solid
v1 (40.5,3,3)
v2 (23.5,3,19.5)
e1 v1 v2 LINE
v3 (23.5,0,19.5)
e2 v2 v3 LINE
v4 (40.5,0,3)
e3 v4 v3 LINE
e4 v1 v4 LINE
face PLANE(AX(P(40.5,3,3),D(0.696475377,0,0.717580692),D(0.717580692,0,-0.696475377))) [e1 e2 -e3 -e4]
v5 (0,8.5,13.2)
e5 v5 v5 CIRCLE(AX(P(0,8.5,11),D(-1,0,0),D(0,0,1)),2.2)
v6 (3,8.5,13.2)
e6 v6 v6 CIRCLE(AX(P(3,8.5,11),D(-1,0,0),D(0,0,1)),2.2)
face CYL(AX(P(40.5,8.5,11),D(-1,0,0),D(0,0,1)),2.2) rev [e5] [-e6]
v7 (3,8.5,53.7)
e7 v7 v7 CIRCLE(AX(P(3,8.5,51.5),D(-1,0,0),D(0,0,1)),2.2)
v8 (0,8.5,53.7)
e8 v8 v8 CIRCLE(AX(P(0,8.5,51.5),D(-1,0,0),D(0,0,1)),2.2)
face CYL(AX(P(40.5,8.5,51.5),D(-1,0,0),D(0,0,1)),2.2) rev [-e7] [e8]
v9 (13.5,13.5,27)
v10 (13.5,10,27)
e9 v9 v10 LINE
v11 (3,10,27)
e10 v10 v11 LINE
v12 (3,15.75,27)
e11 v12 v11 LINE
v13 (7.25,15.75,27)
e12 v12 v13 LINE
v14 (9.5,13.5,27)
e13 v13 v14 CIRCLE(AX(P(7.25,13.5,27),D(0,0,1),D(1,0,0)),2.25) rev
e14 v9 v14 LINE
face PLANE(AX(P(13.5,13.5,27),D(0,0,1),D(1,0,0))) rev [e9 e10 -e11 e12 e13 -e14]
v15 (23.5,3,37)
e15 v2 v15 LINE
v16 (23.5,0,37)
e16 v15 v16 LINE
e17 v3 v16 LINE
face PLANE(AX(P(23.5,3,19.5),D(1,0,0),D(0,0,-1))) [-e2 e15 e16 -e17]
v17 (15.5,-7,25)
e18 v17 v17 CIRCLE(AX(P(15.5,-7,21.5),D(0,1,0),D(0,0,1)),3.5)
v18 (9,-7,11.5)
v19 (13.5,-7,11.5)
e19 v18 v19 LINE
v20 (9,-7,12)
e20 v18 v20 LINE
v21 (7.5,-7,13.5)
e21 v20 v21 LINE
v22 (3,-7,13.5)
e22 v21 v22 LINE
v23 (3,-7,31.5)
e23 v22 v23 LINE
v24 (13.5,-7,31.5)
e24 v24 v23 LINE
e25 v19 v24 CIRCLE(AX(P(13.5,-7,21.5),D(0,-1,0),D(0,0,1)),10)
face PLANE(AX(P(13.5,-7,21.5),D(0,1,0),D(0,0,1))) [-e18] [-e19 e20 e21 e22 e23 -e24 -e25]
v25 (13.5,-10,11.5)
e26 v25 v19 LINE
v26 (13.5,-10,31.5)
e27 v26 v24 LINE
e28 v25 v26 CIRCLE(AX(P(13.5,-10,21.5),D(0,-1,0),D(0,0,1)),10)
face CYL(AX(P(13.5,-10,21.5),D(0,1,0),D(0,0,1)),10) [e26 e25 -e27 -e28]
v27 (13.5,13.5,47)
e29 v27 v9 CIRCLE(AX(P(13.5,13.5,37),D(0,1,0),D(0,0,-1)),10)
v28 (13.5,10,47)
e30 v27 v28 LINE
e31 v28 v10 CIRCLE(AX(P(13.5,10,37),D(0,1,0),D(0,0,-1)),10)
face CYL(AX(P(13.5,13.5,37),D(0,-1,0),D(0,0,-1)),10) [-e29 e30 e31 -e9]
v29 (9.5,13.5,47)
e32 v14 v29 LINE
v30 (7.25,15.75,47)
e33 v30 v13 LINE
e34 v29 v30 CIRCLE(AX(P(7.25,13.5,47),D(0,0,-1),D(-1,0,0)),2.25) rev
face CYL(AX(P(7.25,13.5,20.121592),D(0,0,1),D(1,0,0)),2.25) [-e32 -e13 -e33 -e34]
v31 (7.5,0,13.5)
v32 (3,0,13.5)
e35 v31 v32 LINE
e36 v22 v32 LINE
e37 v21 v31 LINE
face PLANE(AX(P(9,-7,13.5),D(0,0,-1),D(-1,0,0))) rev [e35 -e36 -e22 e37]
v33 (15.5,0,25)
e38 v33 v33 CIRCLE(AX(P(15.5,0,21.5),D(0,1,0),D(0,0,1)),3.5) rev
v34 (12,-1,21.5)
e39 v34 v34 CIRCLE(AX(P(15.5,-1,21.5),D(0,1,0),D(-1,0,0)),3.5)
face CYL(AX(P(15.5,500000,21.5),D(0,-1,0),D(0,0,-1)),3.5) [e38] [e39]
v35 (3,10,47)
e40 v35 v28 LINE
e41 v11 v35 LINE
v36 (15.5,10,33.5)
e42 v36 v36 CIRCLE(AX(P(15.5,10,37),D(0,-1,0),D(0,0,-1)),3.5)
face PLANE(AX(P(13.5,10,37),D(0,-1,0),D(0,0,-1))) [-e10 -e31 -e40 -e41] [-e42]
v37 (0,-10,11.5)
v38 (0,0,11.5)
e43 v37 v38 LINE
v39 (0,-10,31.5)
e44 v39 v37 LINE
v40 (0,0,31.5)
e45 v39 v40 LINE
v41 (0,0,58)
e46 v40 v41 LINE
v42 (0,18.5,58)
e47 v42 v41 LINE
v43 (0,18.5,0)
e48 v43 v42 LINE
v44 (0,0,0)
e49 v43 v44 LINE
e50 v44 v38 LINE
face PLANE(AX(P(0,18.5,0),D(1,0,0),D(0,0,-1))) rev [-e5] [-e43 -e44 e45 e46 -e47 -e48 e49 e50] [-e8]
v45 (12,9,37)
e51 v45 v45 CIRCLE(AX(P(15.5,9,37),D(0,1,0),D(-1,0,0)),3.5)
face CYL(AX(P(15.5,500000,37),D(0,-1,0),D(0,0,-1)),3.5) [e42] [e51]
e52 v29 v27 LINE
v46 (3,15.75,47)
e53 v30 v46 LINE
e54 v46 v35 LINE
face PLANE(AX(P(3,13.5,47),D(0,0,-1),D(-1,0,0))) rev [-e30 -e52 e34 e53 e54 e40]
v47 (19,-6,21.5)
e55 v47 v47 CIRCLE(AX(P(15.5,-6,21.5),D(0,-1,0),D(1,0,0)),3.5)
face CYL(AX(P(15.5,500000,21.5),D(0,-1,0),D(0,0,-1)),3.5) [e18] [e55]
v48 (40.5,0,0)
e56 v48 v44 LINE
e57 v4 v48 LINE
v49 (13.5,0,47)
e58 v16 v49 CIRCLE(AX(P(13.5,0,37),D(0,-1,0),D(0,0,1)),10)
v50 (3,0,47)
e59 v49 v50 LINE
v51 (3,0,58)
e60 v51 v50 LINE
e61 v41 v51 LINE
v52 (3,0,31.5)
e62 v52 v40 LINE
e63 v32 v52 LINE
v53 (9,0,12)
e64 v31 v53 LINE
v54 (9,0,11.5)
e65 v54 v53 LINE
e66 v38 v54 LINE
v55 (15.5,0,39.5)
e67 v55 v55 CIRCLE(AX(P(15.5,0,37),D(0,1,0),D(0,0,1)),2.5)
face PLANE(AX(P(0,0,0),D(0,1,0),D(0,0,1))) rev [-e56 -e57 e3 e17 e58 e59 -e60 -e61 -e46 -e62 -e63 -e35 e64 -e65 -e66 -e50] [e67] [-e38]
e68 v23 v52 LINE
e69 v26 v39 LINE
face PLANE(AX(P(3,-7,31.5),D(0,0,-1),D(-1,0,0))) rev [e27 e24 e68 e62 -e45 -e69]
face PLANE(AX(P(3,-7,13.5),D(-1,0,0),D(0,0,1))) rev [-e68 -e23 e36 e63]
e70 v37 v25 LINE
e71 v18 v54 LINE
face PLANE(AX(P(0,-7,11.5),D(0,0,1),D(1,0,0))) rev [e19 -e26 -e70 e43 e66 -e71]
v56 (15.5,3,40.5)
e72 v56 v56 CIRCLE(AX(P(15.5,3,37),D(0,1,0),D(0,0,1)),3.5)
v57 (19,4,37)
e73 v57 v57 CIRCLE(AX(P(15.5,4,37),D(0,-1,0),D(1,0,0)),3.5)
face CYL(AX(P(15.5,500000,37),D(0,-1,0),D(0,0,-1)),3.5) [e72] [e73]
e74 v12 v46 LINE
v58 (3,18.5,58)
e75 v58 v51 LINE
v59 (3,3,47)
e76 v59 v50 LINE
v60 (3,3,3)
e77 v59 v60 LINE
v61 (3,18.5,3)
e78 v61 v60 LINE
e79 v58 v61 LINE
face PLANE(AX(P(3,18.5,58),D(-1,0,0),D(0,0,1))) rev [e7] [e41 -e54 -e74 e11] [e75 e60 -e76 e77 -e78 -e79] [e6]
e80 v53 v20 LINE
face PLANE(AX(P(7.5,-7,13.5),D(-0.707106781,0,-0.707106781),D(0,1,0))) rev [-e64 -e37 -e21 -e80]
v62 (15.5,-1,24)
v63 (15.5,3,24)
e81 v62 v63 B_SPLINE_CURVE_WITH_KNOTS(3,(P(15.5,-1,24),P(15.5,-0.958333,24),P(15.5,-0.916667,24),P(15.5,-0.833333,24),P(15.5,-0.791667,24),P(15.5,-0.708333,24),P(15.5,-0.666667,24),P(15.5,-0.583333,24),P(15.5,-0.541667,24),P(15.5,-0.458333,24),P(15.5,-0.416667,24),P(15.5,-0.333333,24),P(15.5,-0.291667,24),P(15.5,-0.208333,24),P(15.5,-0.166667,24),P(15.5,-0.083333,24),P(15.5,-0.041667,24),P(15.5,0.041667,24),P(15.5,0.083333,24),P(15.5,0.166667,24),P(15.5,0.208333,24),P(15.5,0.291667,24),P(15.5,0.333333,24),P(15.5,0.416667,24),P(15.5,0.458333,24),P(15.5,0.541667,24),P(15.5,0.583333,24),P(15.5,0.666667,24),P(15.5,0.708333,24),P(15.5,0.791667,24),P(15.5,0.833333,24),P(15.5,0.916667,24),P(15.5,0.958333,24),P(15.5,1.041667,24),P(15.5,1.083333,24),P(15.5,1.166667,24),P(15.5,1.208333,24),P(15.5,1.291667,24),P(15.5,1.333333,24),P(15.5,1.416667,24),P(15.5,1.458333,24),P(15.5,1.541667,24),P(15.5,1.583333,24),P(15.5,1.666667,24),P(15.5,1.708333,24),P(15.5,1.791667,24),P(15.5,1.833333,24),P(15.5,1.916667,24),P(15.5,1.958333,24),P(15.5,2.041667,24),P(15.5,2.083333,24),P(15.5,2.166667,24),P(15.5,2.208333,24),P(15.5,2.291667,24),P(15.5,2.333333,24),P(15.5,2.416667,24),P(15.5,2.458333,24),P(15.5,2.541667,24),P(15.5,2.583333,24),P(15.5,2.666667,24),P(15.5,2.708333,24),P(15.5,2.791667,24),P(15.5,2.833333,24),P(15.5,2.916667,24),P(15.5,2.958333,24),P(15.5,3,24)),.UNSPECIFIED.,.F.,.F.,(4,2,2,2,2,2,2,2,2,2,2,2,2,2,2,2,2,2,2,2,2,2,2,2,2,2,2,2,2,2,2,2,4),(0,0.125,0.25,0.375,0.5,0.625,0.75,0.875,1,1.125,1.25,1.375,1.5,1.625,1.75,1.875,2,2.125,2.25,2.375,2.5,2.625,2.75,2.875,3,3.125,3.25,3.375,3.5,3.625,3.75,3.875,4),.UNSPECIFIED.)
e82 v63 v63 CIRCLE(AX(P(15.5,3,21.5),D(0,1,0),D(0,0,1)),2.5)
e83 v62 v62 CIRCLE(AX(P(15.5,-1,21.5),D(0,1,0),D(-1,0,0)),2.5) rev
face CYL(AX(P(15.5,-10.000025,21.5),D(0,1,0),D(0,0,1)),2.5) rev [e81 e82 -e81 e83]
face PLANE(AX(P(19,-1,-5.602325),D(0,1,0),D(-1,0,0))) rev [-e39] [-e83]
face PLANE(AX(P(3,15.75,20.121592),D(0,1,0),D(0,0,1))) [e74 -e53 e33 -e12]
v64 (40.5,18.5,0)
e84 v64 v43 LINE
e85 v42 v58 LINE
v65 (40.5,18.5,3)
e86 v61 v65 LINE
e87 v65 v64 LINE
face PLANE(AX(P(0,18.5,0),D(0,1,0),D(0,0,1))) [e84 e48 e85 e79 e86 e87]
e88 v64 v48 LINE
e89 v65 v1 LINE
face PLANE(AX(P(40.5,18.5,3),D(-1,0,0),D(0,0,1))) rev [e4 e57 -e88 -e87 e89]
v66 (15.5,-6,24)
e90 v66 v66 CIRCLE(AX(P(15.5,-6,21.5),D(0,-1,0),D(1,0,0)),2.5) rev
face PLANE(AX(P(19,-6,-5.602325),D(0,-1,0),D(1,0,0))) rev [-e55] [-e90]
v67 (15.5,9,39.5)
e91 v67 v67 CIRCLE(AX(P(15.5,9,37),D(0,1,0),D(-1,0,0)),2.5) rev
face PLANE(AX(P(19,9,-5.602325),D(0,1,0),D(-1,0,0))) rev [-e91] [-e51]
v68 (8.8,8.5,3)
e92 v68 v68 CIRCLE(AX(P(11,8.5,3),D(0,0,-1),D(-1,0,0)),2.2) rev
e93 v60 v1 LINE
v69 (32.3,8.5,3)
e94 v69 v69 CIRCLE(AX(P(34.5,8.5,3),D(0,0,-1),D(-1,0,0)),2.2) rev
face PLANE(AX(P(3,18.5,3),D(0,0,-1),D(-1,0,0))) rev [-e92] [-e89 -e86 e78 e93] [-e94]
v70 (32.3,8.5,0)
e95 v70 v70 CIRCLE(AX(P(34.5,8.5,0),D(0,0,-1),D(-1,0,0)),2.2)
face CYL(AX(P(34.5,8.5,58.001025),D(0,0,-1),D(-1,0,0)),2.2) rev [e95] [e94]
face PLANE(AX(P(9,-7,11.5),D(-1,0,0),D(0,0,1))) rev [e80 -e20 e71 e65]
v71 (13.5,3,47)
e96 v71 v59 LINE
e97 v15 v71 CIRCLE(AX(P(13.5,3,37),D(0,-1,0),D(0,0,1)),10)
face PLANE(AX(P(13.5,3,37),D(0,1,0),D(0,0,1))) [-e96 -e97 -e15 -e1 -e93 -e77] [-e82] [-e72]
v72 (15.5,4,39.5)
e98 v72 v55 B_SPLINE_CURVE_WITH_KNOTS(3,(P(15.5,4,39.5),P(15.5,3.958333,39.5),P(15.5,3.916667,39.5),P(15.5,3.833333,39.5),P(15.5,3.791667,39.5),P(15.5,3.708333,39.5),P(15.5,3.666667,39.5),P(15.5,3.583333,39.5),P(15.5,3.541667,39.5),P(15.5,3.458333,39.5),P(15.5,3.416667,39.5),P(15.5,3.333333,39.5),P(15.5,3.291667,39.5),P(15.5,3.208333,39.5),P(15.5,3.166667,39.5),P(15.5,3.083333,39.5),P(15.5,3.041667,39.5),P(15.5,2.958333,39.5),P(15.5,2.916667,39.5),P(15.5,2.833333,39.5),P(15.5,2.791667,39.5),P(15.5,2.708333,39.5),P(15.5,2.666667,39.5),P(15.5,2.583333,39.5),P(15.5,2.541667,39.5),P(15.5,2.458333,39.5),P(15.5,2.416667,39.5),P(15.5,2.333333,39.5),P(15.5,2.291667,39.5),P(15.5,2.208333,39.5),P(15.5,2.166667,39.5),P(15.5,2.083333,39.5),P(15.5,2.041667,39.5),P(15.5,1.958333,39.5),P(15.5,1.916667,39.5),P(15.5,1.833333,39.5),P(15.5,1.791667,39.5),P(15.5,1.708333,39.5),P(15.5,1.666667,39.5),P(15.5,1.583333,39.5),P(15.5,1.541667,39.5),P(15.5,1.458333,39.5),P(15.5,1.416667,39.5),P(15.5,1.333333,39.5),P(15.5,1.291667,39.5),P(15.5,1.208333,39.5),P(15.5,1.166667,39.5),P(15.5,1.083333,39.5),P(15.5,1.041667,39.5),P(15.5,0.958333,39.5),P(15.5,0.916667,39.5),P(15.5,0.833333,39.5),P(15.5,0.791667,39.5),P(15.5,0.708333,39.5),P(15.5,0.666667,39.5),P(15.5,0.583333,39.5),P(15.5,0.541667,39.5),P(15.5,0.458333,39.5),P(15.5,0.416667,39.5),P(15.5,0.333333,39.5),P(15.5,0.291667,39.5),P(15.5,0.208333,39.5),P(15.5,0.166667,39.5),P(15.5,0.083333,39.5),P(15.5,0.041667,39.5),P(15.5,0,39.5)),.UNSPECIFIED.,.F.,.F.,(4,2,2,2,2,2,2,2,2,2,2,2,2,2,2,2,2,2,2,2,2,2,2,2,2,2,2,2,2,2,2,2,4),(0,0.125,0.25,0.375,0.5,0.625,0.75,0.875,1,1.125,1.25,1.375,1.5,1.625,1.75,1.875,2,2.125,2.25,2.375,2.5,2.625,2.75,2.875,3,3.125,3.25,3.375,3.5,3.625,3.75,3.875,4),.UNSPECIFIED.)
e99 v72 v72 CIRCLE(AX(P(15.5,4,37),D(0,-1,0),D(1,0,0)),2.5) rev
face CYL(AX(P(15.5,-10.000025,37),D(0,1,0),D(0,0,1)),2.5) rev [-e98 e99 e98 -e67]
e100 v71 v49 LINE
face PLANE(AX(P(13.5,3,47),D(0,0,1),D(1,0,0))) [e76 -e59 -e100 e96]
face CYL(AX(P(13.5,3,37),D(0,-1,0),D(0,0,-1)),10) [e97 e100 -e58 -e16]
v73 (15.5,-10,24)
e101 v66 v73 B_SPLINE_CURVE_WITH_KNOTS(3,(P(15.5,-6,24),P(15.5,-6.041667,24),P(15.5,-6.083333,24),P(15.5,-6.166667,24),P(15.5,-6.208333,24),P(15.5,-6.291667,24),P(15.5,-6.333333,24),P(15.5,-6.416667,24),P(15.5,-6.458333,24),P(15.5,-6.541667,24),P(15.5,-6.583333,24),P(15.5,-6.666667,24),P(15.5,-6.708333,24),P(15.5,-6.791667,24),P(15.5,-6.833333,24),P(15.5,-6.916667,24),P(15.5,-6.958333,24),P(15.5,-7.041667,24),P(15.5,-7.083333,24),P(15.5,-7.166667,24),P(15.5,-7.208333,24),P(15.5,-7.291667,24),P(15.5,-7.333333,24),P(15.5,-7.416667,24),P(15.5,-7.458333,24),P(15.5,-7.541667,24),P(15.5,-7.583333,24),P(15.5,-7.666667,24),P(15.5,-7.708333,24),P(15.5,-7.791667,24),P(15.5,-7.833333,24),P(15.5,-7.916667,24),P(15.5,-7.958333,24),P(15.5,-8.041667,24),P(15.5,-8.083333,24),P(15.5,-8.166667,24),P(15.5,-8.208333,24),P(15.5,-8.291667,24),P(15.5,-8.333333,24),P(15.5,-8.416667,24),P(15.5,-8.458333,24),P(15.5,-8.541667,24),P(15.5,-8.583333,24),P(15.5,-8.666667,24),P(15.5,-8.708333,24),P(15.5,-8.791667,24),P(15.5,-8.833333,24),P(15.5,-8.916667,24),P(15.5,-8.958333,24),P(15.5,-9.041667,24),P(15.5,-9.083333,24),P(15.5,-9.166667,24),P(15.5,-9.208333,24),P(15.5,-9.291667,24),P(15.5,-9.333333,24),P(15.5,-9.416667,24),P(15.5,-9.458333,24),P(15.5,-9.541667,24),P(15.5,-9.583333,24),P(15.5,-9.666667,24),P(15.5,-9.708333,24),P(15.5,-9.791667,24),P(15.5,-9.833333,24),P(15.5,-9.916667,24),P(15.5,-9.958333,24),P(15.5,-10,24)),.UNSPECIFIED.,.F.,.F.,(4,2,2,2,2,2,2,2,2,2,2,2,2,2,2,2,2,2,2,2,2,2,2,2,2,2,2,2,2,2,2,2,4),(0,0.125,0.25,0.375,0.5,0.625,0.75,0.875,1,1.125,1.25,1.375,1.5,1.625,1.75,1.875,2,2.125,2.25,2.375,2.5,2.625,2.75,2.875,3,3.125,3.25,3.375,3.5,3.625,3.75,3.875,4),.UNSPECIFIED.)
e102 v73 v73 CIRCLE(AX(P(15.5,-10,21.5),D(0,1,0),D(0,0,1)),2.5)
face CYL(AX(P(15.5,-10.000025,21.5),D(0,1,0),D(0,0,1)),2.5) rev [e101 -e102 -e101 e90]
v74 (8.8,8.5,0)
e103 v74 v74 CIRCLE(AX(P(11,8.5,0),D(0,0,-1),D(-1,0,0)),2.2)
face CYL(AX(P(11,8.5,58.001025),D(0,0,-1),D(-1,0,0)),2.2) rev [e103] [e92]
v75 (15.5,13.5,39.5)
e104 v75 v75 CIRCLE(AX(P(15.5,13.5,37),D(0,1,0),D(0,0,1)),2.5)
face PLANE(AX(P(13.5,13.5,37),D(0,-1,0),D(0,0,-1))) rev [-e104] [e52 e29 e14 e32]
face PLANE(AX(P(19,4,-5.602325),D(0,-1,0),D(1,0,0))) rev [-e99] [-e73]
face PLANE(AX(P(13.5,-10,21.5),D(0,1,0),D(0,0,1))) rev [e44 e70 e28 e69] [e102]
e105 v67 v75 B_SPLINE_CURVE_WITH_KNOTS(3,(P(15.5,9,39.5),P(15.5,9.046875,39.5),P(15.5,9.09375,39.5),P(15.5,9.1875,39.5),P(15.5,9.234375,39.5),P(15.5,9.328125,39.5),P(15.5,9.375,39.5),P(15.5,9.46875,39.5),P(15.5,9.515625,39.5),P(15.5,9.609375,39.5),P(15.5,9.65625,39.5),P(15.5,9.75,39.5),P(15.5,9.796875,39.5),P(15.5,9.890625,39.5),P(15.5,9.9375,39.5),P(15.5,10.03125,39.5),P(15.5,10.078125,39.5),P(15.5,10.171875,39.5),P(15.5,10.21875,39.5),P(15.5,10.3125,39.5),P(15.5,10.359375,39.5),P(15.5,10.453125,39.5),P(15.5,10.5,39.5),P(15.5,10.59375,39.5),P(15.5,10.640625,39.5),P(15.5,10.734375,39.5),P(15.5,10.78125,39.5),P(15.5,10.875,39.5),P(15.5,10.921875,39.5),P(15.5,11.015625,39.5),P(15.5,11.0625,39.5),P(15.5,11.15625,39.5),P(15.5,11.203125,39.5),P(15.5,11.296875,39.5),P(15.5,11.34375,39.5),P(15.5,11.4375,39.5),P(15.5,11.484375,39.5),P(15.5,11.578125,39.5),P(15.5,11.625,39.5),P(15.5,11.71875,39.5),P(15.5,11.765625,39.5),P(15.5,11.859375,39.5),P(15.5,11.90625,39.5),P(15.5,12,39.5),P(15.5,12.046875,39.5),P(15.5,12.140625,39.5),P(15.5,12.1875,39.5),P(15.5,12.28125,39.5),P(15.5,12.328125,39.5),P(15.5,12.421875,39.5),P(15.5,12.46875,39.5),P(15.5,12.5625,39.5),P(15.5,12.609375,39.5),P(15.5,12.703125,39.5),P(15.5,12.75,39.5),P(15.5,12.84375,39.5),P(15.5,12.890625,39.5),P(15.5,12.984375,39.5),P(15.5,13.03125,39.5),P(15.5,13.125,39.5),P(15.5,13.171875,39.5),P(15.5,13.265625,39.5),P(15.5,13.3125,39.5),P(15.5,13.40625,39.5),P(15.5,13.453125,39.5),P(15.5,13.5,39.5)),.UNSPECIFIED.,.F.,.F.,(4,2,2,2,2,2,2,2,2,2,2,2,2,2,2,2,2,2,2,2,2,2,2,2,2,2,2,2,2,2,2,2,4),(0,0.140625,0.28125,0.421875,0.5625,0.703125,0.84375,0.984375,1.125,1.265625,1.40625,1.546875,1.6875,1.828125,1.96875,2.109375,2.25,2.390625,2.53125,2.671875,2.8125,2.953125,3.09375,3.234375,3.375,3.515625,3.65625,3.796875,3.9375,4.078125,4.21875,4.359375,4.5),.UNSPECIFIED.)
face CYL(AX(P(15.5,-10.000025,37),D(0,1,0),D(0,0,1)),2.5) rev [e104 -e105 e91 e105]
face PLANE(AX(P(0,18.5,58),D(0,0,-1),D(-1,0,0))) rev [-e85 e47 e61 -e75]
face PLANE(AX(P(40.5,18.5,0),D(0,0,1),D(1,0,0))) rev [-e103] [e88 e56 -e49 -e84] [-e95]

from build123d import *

# Parameters (mm, degrees)
BOSS_EXTRUDE1_DEPTH = 18.5
BOSS_EXTRUDE2_DEPTH = 3
BOSS_EXTRUDE3_START = 7
BOSS_EXTRUDE3_DEPTH = 3.5
SKETCH4_W           = 6.5
SKETCH4_H           = 2.25
BOSS_EXTRUDE4_DEPTH = 20
FILLET1_R           = 2.25
BOSS_EXTRUDE5_DEPTH = 7
BOSS_EXTRUDE6_DEPTH = 3
SKETCH7_R           = 2.5
CUT_EXTRUDE1_DEPTH  = 75.541934507
SKETCH8_R           = 2.2
CUT_EXTRUDE2_DEPTH  = 74.11976477
CUT_EXTRUDE3_REACH  = 75.12
SKETCH9_R           = 2.2
BOSS_EXTRUDE7_REACH = 77.196
SKETCH10_R          = 3.5
SKETCH10_R_2        = 2.5
BOSS_EXTRUDE8_REACH = 74.419
SKETCH11_R          = 3.5
SKETCH11_R_2        = 2.5
CUT_EXTRUDE4_REACH  = 66.742
SKETCH12_W          = 7
SKETCH12_H          = 5
CHAMFER1_SIZE       = 1.5


with BuildPart() as part:
    # Sketch1 → Boss-Extrude1 (new body)
    with BuildSketch(Plane(origin=(0, 0, 0), x_dir=(1, 0, 0), z_dir=(0, 1, 0))):
        Polygon((40.5, 0), (0, 0), (0, -58), (3, -58), (3, -3), (40.5, -3), align=None)
    extrude(amount=BOSS_EXTRUDE1_DEPTH)

    # Sketch2 → Boss-Extrude2 (add)
    with BuildSketch(Plane.XZ):
        with BuildLine():
            Line((40.5, 3), (23.5, 19.5))
            Line((23.5, 19.5), (23.5, 37))
            ThreePointArc((23.5, 37), (20.571067812, 44.071067812), (13.5, 47))
            Line((13.5, 47), (3, 47))
            Line((3, 47), (3, 3))
            Line((3, 3), (40.5, 3))
        make_face()
    extrude(amount=-BOSS_EXTRUDE2_DEPTH)

    # Sketch3 → Boss-Extrude3 (add)
    with BuildSketch(Plane(origin=(0, 3, 0), x_dir=(1, 0, 0), z_dir=(0, 1, 0)).offset(BOSS_EXTRUDE3_START)):
        with BuildLine():
            Line((3, -47), (13.5, -47))
            ThreePointArc((13.5, -47), (23.5, -37), (13.5, -27))
            Line((13.5, -27), (3, -27))
            Line((3, -27), (3, -47))
        make_face()
    extrude(amount=BOSS_EXTRUDE3_DEPTH)

    # Sketch4 → Boss-Extrude4 (add)
    with BuildSketch(Plane.XY.offset(47)):
        with Locations((6.25, 14.625)):
            Rectangle(SKETCH4_W, SKETCH4_H)
    extrude(amount=-BOSS_EXTRUDE4_DEPTH)

    # Fillet1
    fillet1_edges = [part.edges().sort_by_distance(p)[0] for p in [
        (9.5, 15.75, 37),
    ]]
    fillet(fillet1_edges, radius=FILLET1_R - 0.0001)  # a hair under: the kernel refuses the full size

    # Sketch5 → Boss-Extrude5 (add)
    with BuildSketch(Plane.XZ):
        Polygon((0, 31.5), (0, 11.5), (9, 11.5), (9, 13.5), (3, 13.5), (3, 31.5), align=None)
    extrude(amount=BOSS_EXTRUDE5_DEPTH)

    # Sketch6 → Boss-Extrude6 (add)
    with BuildSketch(Plane.XZ.offset(7)):
        with BuildLine():
            Line((0, 11.5), (0, 31.5))
            Line((0, 31.5), (13.5, 31.5))
            ThreePointArc((13.5, 31.5), (23.5, 21.5), (13.5, 11.5))
            Line((13.5, 11.5), (0, 11.5))
        make_face()
    extrude(amount=BOSS_EXTRUDE6_DEPTH)

    # Sketch7 → Cut-Extrude1 (cut, through all)
    with BuildSketch(Plane(origin=(0, 13.5, 0), x_dir=(1, 0, 0), z_dir=(0, 1, 0))):
        with Locations(Location((15.5, -21.5, 0), (0, 0, 270))):
            Circle(SKETCH7_R)
        with Locations(Location((15.5, -37, 0), (0, 0, 270))):
            Circle(SKETCH7_R)
    extrude(amount=-CUT_EXTRUDE1_DEPTH, mode=Mode.SUBTRACT)

    # Sketch8 → Cut-Extrude2 (cut, through all)
    with BuildSketch(Plane.ZY):
        with Locations((11, 8.5)):
            Circle(SKETCH8_R)
        with Locations((51.5, 8.5)):
            Circle(SKETCH8_R)
    extrude(amount=-CUT_EXTRUDE2_DEPTH, mode=Mode.SUBTRACT)

    # Sketch9 → Cut-Extrude3 (cut, up to next)
    with BuildSketch(Plane(origin=(0, 0, 0), x_dir=(-1, 0, 0), z_dir=(0, 0, -1)), mode=Mode.PRIVATE) as cut_extrude3_sk1:
        with Locations((-34.5, 8.5)):
            Circle(SKETCH9_R)
    cut_extrude3_tool1 = extrude(cut_extrude3_sk1.sketch, amount=-CUT_EXTRUDE3_REACH, mode=Mode.PRIVATE) & part.part
    # Sketch9 → Cut-Extrude3 (cut, up to next)
    with BuildSketch(Plane(origin=(0, 0, 0), x_dir=(-1, 0, 0), z_dir=(0, 0, -1)), mode=Mode.PRIVATE) as cut_extrude3_sk2:
        with Locations((-11, 8.5)):
            Circle(SKETCH9_R)
    cut_extrude3_tool2 = extrude(cut_extrude3_sk2.sketch, amount=-CUT_EXTRUDE3_REACH, mode=Mode.PRIVATE) & part.part
    add(cut_extrude3_tool1.solids().sort_by_distance((34.5, 8.5, 0))[0], mode=Mode.SUBTRACT)
    add(cut_extrude3_tool2.solids().sort_by_distance((11, 8.5, 0))[0], mode=Mode.SUBTRACT)

    # Sketch10 → Boss-Extrude7 (add, up to next)
    with BuildSketch(Plane(origin=(0, -7, 0), x_dir=(1, 0, 0), z_dir=(0, 1, 0)), mode=Mode.PRIVATE) as boss_extrude7_sk1:
        with Locations(Location((15.5, -21.5, 0), (0, 0, 270))):
            Circle(SKETCH10_R)
        with Locations(Location((15.5, -21.5, 0), (0, 0, 270))):
            Circle(SKETCH10_R_2, mode=Mode.SUBTRACT)
    boss_extrude7_tool1 = extrude(boss_extrude7_sk1.sketch, amount=BOSS_EXTRUDE7_REACH, mode=Mode.PRIVATE) - part.part
    add(boss_extrude7_tool1.solids().sort_by_distance((15.5, -7, 18.098995))[0])

    # Sketch11 → Boss-Extrude8 (add, up to next)
    with BuildSketch(Plane(origin=(0, 3, 0), x_dir=(1, 0, 0), z_dir=(0, 1, 0)), mode=Mode.PRIVATE) as boss_extrude8_sk1:
        with Locations(Location((15.5, -37, 0), (0, 0, 90))):
            Circle(SKETCH11_R)
        with Locations(Location((15.5, -37, 0), (0, 0, 270))):
            Circle(SKETCH11_R_2, mode=Mode.SUBTRACT)
    boss_extrude8_tool1 = extrude(boss_extrude8_sk1.sketch, amount=BOSS_EXTRUDE8_REACH, mode=Mode.PRIVATE) - part.part
    add(boss_extrude8_tool1.solids().sort_by_distance((15.5, 3, 40.401005))[0])

    # Cut-Extrude4: up to this face of the body (flat: up to its plane)
    cut_extrude4_end = Plane(part.part.faces().sort_by_distance((21.694792225, 10.874217494, 3))[0])
    # Sketch12 → Cut-Extrude4 (cut, up to the picked face)
    with BuildSketch(Plane.XY.offset(47), mode=Mode.PRIVATE) as cut_extrude4_sk1:
        with Locations((15.5, -3.5)):
            Rectangle(SKETCH12_W, SKETCH12_H)
    cut_extrude4_tool1 = split(extrude(cut_extrude4_sk1.sketch, amount=-CUT_EXTRUDE4_REACH, mode=Mode.PRIVATE), bisect_by=cut_extrude4_end, keep=Keep.BOTH, mode=Mode.PRIVATE)
    # Sketch12 → Cut-Extrude4 (cut, up to the picked face)
    with BuildSketch(Plane.XY.offset(47), mode=Mode.PRIVATE) as cut_extrude4_sk2:
        with Locations((15.5, 6.5)):
            Rectangle(SKETCH12_W, SKETCH12_H)
    cut_extrude4_tool2 = split(extrude(cut_extrude4_sk2.sketch, amount=-CUT_EXTRUDE4_REACH, mode=Mode.PRIVATE), bisect_by=cut_extrude4_end, keep=Keep.BOTH, mode=Mode.PRIVATE)
    add(cut_extrude4_tool1.solids().sort_by(Axis((15.5, -3.5, 47), (0, 0, -1)))[0], mode=Mode.SUBTRACT)
    add(cut_extrude4_tool2.solids().sort_by(Axis((15.5, 6.5, 47), (0, 0, -1)))[0], mode=Mode.SUBTRACT)

    # Chamfer1
    chamfer1_edges = [part.edges().sort_by_distance(p)[0] for p in [
        (9, -3.5, 13.5),
    ]]
    chamfer(chamfer1_edges, length=CHAMFER1_SIZE)


solid = part.part
